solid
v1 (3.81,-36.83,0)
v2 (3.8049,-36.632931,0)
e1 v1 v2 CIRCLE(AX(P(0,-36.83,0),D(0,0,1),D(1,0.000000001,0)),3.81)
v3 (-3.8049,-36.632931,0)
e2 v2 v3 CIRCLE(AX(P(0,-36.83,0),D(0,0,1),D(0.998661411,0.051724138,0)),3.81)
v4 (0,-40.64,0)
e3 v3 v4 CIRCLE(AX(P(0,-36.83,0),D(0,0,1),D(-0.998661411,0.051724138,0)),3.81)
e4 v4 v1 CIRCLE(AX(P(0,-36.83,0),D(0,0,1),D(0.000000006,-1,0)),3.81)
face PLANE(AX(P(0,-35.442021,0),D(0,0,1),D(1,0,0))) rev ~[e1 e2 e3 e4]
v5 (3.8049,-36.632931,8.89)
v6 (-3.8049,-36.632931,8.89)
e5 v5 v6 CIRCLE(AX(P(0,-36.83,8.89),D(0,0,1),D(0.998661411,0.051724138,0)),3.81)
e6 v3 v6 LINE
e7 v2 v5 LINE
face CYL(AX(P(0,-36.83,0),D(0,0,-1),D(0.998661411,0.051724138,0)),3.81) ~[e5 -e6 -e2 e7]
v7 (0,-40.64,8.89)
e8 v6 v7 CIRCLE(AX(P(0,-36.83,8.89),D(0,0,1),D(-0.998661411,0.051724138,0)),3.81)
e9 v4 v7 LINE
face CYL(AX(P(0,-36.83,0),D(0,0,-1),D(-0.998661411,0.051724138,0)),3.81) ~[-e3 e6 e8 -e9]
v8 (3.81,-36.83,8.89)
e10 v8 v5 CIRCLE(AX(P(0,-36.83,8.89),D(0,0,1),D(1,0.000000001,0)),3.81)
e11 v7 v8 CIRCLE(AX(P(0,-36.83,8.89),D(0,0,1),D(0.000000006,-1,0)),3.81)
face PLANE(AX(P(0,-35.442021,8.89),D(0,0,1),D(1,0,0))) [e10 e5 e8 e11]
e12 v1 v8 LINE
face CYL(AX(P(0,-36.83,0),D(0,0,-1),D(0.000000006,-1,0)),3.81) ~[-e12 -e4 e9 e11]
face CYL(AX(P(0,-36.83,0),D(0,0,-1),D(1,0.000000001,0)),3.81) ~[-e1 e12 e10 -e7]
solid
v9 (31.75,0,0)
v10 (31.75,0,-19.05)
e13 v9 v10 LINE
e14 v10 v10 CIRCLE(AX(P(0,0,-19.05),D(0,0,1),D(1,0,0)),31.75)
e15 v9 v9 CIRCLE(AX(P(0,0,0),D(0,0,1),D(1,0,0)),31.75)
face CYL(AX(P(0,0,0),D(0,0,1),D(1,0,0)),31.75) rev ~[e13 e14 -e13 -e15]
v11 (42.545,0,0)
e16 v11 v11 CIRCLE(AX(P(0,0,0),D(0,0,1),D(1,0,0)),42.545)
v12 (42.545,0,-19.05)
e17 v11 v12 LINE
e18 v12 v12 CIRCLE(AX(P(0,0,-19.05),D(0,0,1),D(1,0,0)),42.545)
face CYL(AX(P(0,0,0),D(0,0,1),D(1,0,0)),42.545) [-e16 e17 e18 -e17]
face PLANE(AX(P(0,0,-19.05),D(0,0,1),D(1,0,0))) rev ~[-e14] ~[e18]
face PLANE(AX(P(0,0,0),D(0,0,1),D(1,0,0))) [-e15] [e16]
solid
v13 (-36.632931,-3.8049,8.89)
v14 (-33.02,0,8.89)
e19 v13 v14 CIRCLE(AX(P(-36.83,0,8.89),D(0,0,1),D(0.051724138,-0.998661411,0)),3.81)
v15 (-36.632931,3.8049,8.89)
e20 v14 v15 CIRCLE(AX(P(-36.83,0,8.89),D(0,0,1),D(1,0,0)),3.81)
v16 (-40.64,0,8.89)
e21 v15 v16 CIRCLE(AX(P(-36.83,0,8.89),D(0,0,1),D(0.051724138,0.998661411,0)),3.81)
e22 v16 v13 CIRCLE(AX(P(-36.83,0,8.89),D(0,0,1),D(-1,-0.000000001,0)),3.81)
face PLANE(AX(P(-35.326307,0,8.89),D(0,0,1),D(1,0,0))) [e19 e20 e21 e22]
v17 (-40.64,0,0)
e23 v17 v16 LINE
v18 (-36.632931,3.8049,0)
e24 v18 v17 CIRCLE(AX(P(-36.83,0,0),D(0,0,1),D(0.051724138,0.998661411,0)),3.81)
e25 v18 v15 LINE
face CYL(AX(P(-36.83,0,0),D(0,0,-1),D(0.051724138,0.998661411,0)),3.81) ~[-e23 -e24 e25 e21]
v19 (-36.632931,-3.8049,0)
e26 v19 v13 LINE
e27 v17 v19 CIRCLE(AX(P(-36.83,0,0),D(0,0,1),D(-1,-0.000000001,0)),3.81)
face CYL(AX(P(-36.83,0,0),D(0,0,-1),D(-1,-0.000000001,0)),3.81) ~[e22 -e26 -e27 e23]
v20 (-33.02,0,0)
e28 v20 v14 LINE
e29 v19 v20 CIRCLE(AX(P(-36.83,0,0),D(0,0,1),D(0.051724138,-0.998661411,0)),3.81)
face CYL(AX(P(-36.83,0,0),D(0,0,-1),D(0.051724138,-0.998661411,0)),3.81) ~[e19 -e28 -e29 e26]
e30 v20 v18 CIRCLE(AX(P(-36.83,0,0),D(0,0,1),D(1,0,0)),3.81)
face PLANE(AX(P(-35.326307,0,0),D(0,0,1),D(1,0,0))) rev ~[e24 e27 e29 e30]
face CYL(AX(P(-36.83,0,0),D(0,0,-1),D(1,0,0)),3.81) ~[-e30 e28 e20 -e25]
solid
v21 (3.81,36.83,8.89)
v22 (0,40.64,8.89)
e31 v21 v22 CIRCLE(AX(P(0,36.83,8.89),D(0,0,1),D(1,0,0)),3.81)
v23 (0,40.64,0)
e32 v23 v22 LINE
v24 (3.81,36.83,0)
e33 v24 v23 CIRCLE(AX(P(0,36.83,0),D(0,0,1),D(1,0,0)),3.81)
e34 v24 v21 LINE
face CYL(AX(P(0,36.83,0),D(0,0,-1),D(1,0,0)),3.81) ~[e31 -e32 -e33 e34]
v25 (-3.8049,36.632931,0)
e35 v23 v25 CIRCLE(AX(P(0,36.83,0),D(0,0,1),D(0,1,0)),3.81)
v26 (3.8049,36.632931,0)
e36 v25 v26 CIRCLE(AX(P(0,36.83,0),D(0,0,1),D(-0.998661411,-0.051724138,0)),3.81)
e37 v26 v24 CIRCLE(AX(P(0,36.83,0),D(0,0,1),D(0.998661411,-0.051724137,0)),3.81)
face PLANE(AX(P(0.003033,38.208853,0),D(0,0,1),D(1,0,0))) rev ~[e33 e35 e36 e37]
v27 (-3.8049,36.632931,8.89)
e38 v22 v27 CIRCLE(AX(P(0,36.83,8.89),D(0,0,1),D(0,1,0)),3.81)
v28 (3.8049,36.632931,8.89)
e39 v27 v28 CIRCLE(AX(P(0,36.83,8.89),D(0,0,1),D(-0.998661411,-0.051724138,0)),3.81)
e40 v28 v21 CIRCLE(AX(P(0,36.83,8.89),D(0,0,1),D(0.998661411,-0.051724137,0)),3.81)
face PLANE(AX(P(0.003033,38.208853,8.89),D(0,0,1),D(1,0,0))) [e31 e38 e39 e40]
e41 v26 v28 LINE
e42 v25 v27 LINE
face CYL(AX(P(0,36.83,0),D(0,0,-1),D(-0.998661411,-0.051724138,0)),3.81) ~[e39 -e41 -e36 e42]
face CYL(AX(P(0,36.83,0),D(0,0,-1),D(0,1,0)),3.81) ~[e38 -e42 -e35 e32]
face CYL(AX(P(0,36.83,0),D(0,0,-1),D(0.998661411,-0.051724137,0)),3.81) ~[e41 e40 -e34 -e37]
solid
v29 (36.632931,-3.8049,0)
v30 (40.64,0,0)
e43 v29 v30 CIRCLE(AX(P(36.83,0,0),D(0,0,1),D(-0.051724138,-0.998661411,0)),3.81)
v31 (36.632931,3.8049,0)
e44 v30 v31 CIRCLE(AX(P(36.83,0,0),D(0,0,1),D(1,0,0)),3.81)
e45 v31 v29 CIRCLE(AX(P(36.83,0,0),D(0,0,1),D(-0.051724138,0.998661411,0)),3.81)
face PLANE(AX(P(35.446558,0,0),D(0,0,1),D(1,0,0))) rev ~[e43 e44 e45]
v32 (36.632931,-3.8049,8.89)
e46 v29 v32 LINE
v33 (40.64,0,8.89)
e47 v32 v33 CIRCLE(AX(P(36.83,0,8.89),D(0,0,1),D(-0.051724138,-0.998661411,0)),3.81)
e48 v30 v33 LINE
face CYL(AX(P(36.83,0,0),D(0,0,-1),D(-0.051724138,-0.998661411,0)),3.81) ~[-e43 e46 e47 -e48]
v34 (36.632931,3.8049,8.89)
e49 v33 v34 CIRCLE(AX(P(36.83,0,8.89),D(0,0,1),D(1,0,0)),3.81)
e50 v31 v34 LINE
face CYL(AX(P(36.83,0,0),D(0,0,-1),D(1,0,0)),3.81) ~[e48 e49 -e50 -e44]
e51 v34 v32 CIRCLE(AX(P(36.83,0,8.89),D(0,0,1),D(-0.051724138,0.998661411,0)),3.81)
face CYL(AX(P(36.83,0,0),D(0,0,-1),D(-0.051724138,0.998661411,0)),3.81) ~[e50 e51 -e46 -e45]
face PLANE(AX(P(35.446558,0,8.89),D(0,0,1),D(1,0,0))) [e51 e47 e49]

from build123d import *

# Parameters (mm, degrees)
F1_DEPTH = 8.89
F0_R     = 42.545
F0_R_2   = 31.75
F2_DEPTH = 19.05


with BuildPart() as f1:
    # F0 (on Top) → F1 (new body)
    with BuildSketch(Plane.XY):
        with BuildLine():
            ThreePointArc((3.81, 36.83), (2.6940768363, 39.5240768363), (0, 40.64))
            ThreePointArc((0, 40.64), (-2.7628728489, 39.4534773909), (-3.8048999754, 36.6329310345))
            ThreePointArc((-3.8048999754, 36.6329310345), (0, 36.83), (3.8048999754, 36.6329310345))
            ThreePointArc((3.8048999754, 36.6329310345), (3.8087247804, 36.7314325264), (3.81, 36.83))
        make_face()
        with BuildLine():
            ThreePointArc((3.8048999754, 36.6329310345), (0, 36.83), (-3.8048999754, 36.6329310345))
            ThreePointArc((-3.8048999754, 36.6329310345), (0, 33.02), (3.8048999754, 36.6329310345))
        make_face()
    extrude(amount=F1_DEPTH)


with BuildPart() as f1b:
    # F0 (on Top) → F1, piece 2 (new body)
    with BuildSketch(Plane.XY):
        with BuildLine():
            ThreePointArc((-33.02, 0), (-34.0671271511, 2.6234773909), (-36.6329310345, 3.8048999754))
            ThreePointArc((-36.6329310345, 3.8048999754), (-36.83, 0), (-36.6329310345, -3.8048999754))
            ThreePointArc((-36.6329310345, -3.8048999754), (-34.0671271511, -2.6234773909), (-33.02, 0))
        make_face()
        with BuildLine():
            ThreePointArc((-36.6329310345, 3.8048999754), (-39.4534773924, 2.7628728475), (-40.64, -4.1e-09))
            ThreePointArc((-40.64, -4.1e-09), (-39.4534773894, -2.7628728503), (-36.6329310345, -3.8048999754))
            ThreePointArc((-36.6329310345, -3.8048999754), (-36.83, 0), (-36.6329310345, 3.8048999754))
        make_face()
    extrude(amount=F1_DEPTH)


with BuildPart() as f1c:
    # F0 (on Top) → F1, piece 3 (new body)
    with BuildSketch(Plane.XY):
        with BuildLine():
            ThreePointArc((36.83, 0), (36.7806997622, 1.905), (36.6329310345, 3.8048999754))
            ThreePointArc((36.6329310345, 3.8048999754), (33.02, 0), (36.6329310345, -3.8048999754))
            ThreePointArc((36.6329310345, -3.8048999754), (36.7806997622, -1.905), (36.83, 0))
        make_face()
        with BuildLine():
            ThreePointArc((36.6329310345, -3.8048999754), (39.4534773909, -2.7628728489), (40.64, 0))
            ThreePointArc((40.64, 0), (39.4534773909, 2.7628728489), (36.6329310345, 3.8048999754))
            ThreePointArc((36.6329310345, 3.8048999754), (36.7806997622, 1.905), (36.83, 0))
            ThreePointArc((36.83, 0), (36.7806997622, -1.905), (36.6329310345, -3.8048999754))
        make_face()
    extrude(amount=F1_DEPTH)


with BuildPart() as f1d:
    # F0 (on Top) → F1, piece 4 (new body)
    with BuildSketch(Plane.XY):
        with BuildLine():
            ThreePointArc((3.8048999754, -36.6329310345), (0, -33.02), (-3.8048999754, -36.6329310345))
            ThreePointArc((-3.8048999754, -36.6329310345), (0, -36.83), (3.8048999754, -36.6329310345))
        make_face()
        with BuildLine():
            ThreePointArc((-3.8048999754, -36.6329310345), (-2.7628728415, -39.4534773987), (2.15e-08, -40.64))
            ThreePointArc((2.15e-08, -40.64), (2.6940768439, -39.5240768287), (3.81, -36.83))
            ThreePointArc((3.81, -36.83), (3.8087247804, -36.7314325264), (3.8048999754, -36.6329310345))
            ThreePointArc((3.8048999754, -36.6329310345), (0, -36.83), (-3.8048999754, -36.6329310345))
        make_face()
    extrude(amount=F1_DEPTH)


with BuildPart() as f2:
    # F0 (on Top) → F2 (new body)
    with BuildSketch(Plane.XY):
        Circle(F0_R)
        with BuildLine():
            ThreePointArc((0, 40.64), (28.7368195874, 28.7368195874), (40.64, 0))
            ThreePointArc((40.64, 0), (28.736819595, -28.7368195798), (2.15e-08, -40.64))
            ThreePointArc((2.15e-08, -40.64), (-28.7368195784, -28.7368195965), (-40.64, -4.1e-09))
            ThreePointArc((-40.64, -4.1e-09), (-28.7368195889, 28.736819586), (0, 40.64))
        make_face(mode=Mode.SUBTRACT)
        with BuildLine():
            ThreePointArc((36.6329310345, -3.8048999754), (33.02, 0), (36.6329310345, 3.8048999754))
            ThreePointArc((36.6329310345, 3.8048999754), (26.0427427511, 26.0427427511), (3.8048999754, 36.6329310345))
            ThreePointArc((3.8048999754, 36.6329310345), (0, 33.02), (-3.8048999754, 36.6329310345))
            ThreePointArc((-3.8048999754, 36.6329310345), (-26.0427427511, 26.0427427511), (-36.6329310345, 3.8048999754))
            ThreePointArc((-36.6329310345, 3.8048999754), (-34.0671271511, 2.6234773909), (-33.02, 0))
            ThreePointArc((-33.02, 0), (-34.0671271511, -2.6234773909), (-36.6329310345, -3.8048999754))
            ThreePointArc((-36.6329310345, -3.8048999754), (-26.0427427511, -26.0427427511), (-3.8048999754, -36.6329310345))
            ThreePointArc((-3.8048999754, -36.6329310345), (0, -33.02), (3.8048999754, -36.6329310345))
            ThreePointArc((3.8048999754, -36.6329310345), (26.0427427511, -26.0427427511), (36.6329310345, -3.8048999754))
        make_face()
        Circle(F0_R_2, mode=Mode.SUBTRACT)
        with BuildLine():
            ThreePointArc((36.6329310345, 3.8048999754), (39.4534773909, 2.7628728489), (40.64, 0))
            ThreePointArc((40.64, 0), (28.7368195874, 28.7368195874), (0, 40.64))
            ThreePointArc((0, 40.64), (2.6940768363, 39.5240768363), (3.81, 36.83))
            ThreePointArc((3.81, 36.83), (3.8087247804, 36.7314325264), (3.8048999754, 36.6329310345))
            ThreePointArc((3.8048999754, 36.6329310345), (26.0427427511, 26.0427427511), (36.6329310345, 3.8048999754))
        make_face()
        with BuildLine():
            ThreePointArc((2.15e-08, -40.64), (28.736819595, -28.7368195798), (40.64, 0))
            ThreePointArc((40.64, 0), (39.4534773909, -2.7628728489), (36.6329310345, -3.8048999754))
            ThreePointArc((36.6329310345, -3.8048999754), (26.0427427511, -26.0427427511), (3.8048999754, -36.6329310345))
            ThreePointArc((3.8048999754, -36.6329310345), (3.8087247804, -36.7314325264), (3.81, -36.83))
            ThreePointArc((3.81, -36.83), (2.6940768439, -39.5240768287), (2.15e-08, -40.64))
        make_face()
        with BuildLine():
            ThreePointArc((-3.8048999754, 36.6329310345), (-2.7628728489, 39.4534773909), (0, 40.64))
            ThreePointArc((0, 40.64), (-28.7368195889, 28.736819586), (-40.64, -4.1e-09))
            ThreePointArc((-40.64, -4.1e-09), (-39.4534773924, 2.7628728475), (-36.6329310345, 3.8048999754))
            ThreePointArc((-36.6329310345, 3.8048999754), (-26.0427427511, 26.0427427511), (-3.8048999754, 36.6329310345))
        make_face()
        with BuildLine():
            ThreePointArc((-40.64, -4.1e-09), (-28.7368195784, -28.7368195965), (2.15e-08, -40.64))
            ThreePointArc((2.15e-08, -40.64), (-2.7628728415, -39.4534773987), (-3.8048999754, -36.6329310345))
            ThreePointArc((-3.8048999754, -36.6329310345), (-26.0427427511, -26.0427427511), (-36.6329310345, -3.8048999754))
            ThreePointArc((-36.6329310345, -3.8048999754), (-39.4534773894, -2.7628728503), (-40.64, -4.1e-09))
        make_face()
        with BuildLine():
            ThreePointArc((36.6329310345, -3.8048999754), (39.4534773909, -2.7628728489), (40.64, 0))
            ThreePointArc((40.64, 0), (39.4534773909, 2.7628728489), (36.6329310345, 3.8048999754))
            ThreePointArc((36.6329310345, 3.8048999754), (36.7806997622, 1.905), (36.83, 0))
            ThreePointArc((36.83, 0), (36.7806997622, -1.905), (36.6329310345, -3.8048999754))
        make_face()
        with BuildLine():
            ThreePointArc((3.81, 36.83), (2.6940768363, 39.5240768363), (0, 40.64))
            ThreePointArc((0, 40.64), (-2.7628728489, 39.4534773909), (-3.8048999754, 36.6329310345))
            ThreePointArc((-3.8048999754, 36.6329310345), (0, 36.83), (3.8048999754, 36.6329310345))
            ThreePointArc((3.8048999754, 36.6329310345), (3.8087247804, 36.7314325264), (3.81, 36.83))
        make_face()
        with BuildLine():
            ThreePointArc((-3.8048999754, -36.6329310345), (-2.7628728415, -39.4534773987), (2.15e-08, -40.64))
            ThreePointArc((2.15e-08, -40.64), (2.6940768439, -39.5240768287), (3.81, -36.83))
            ThreePointArc((3.81, -36.83), (3.8087247804, -36.7314325264), (3.8048999754, -36.6329310345))
            ThreePointArc((3.8048999754, -36.6329310345), (0, -36.83), (-3.8048999754, -36.6329310345))
        make_face()
        with BuildLine():
            ThreePointArc((-36.6329310345, 3.8048999754), (-39.4534773924, 2.7628728475), (-40.64, -4.1e-09))
            ThreePointArc((-40.64, -4.1e-09), (-39.4534773894, -2.7628728503), (-36.6329310345, -3.8048999754))
            ThreePointArc((-36.6329310345, -3.8048999754), (-36.83, 0), (-36.6329310345, 3.8048999754))
        make_face()
        with BuildLine():
            ThreePointArc((36.83, 0), (36.7806997622, 1.905), (36.6329310345, 3.8048999754))
            ThreePointArc((36.6329310345, 3.8048999754), (33.02, 0), (36.6329310345, -3.8048999754))
            ThreePointArc((36.6329310345, -3.8048999754), (36.7806997622, -1.905), (36.83, 0))
        make_face()
        with BuildLine():
            ThreePointArc((3.8048999754, 36.6329310345), (0, 36.83), (-3.8048999754, 36.6329310345))
            ThreePointArc((-3.8048999754, 36.6329310345), (0, 33.02), (3.8048999754, 36.6329310345))
        make_face()
        with BuildLine():
            ThreePointArc((3.8048999754, -36.6329310345), (0, -33.02), (-3.8048999754, -36.6329310345))
            ThreePointArc((-3.8048999754, -36.6329310345), (0, -36.83), (3.8048999754, -36.6329310345))
        make_face()
        with BuildLine():
            ThreePointArc((-33.02, 0), (-34.0671271511, 2.6234773909), (-36.6329310345, 3.8048999754))
            ThreePointArc((-36.6329310345, 3.8048999754), (-36.83, 0), (-36.6329310345, -3.8048999754))
            ThreePointArc((-36.6329310345, -3.8048999754), (-34.0671271511, -2.6234773909), (-33.02, 0))
        make_face()
    extrude(amount=-F2_DEPTH)


solid = Compound([f1.part, f1b.part, f1c.part, f1d.part, f2.part])
